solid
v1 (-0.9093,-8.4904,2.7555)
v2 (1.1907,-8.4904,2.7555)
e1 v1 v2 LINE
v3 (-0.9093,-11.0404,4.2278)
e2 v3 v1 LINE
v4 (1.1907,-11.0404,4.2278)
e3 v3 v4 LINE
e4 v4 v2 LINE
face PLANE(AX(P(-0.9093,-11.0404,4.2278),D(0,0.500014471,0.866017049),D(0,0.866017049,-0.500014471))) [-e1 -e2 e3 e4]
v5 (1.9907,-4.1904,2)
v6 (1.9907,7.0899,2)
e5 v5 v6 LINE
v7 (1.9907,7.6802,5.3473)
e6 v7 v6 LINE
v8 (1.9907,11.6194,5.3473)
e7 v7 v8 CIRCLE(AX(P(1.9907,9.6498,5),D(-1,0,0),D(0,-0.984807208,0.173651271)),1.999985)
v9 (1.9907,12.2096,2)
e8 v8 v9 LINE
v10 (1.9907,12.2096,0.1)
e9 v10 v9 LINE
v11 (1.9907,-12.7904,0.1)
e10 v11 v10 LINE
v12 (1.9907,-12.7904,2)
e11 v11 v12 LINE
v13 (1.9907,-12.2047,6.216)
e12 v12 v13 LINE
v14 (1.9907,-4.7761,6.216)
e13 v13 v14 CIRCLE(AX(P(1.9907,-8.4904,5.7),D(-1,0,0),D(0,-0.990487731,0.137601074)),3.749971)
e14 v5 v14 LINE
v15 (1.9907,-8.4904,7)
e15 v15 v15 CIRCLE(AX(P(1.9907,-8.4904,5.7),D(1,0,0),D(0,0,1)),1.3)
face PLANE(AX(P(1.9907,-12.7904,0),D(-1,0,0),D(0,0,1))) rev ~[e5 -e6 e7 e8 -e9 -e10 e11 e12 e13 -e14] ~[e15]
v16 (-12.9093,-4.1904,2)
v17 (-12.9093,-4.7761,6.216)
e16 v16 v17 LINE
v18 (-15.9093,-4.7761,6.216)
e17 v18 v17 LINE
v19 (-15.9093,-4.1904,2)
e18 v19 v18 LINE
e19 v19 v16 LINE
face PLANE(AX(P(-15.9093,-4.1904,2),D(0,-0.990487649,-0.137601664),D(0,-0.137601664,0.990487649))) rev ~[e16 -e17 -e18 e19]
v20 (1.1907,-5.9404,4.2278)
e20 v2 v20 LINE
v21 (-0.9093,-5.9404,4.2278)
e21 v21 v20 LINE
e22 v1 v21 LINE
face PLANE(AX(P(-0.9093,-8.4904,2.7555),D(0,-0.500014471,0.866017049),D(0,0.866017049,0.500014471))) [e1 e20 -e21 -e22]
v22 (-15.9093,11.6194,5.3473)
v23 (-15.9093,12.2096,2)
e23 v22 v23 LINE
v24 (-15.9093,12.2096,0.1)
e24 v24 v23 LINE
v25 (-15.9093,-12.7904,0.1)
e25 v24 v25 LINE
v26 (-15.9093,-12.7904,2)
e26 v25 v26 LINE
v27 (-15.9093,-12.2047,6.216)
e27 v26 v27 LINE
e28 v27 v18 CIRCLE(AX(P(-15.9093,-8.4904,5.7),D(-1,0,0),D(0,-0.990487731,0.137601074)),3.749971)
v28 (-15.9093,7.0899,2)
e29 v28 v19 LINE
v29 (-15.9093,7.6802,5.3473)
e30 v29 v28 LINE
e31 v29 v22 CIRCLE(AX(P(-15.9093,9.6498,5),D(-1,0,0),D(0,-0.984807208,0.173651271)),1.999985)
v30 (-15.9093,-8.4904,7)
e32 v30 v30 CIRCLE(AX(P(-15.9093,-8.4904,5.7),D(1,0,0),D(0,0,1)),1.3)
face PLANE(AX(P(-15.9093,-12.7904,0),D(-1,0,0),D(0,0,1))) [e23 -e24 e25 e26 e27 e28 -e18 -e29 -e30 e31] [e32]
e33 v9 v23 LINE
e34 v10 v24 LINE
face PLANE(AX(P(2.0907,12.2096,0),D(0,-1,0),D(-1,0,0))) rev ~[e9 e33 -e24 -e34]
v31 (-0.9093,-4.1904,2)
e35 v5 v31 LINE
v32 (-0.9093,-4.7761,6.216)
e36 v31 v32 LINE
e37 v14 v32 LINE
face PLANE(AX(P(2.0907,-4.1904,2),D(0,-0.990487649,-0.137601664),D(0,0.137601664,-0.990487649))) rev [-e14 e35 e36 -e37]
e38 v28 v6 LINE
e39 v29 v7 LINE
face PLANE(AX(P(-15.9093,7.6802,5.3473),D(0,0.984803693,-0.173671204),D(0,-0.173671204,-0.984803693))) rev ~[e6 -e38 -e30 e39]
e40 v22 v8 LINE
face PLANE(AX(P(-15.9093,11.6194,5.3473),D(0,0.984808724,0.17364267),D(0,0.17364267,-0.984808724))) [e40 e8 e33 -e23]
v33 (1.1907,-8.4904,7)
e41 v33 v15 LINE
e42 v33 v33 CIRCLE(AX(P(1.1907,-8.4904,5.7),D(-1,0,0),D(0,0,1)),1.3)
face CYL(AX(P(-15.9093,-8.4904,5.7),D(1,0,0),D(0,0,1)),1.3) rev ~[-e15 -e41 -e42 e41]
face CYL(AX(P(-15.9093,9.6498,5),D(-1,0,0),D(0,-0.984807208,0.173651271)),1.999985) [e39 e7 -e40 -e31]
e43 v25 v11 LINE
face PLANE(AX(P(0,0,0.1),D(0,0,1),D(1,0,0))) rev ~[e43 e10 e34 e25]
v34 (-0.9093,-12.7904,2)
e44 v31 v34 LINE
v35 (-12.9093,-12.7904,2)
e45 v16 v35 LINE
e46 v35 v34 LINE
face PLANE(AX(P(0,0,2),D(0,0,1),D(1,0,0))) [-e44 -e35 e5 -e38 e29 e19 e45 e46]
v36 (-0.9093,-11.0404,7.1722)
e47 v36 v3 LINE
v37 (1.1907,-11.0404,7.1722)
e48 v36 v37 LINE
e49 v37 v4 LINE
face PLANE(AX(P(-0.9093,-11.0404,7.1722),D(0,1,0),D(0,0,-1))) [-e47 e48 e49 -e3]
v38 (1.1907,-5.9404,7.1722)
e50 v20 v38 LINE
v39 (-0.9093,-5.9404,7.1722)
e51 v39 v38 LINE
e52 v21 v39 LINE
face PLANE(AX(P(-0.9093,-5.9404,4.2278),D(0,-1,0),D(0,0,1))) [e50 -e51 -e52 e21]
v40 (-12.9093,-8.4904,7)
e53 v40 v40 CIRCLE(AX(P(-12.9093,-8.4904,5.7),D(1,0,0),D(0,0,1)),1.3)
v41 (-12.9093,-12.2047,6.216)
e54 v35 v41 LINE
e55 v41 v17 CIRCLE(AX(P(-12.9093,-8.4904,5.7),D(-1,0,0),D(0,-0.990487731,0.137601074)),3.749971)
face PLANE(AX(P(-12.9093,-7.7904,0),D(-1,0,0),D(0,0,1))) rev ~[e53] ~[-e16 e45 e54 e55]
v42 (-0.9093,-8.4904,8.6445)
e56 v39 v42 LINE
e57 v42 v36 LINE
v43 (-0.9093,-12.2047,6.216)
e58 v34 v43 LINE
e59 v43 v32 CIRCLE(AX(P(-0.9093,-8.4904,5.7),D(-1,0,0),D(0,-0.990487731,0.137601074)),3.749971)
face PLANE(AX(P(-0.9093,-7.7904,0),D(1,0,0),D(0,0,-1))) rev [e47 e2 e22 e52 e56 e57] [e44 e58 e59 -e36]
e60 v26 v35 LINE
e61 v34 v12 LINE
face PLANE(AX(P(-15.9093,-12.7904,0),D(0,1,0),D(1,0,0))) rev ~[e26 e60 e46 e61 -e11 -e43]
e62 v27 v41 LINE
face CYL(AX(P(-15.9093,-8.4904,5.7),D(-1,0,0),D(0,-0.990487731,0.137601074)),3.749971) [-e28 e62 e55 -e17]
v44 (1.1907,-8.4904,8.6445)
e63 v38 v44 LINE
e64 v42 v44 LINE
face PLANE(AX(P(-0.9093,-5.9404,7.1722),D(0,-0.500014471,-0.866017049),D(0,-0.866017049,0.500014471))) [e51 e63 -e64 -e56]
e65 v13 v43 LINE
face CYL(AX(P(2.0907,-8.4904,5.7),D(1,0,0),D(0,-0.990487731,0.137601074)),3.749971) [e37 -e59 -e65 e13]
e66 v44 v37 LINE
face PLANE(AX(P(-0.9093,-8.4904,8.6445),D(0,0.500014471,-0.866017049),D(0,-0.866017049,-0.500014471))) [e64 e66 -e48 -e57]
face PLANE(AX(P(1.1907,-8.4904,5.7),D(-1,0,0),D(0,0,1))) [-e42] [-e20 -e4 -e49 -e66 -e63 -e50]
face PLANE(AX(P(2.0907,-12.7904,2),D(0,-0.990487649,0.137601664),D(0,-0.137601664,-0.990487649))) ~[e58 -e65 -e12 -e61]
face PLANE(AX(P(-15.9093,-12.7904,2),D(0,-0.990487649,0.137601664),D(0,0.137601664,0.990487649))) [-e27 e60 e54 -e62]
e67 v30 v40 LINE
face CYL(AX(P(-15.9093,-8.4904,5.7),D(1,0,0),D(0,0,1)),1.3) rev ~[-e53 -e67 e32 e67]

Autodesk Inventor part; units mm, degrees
ref_plane "YZ Plane" through (0, 0, 0) normal (1, 0, 0) x (0, 1, 0)
ref_plane "XZ Plane" through (0, 0, 0) normal (0, 1, 0) x (-1, 0, 0)
ref_plane "XY Plane" through (0, 0, 0) normal (0, 0, 1) x (1, 0, 0)
sketch "Sketch1" plane through (0, 0, 0) normal (0, 0, 1) x (1, 0, 0)
  line L0 (2.0907, -12.7904) -> (2.0907, 12.2096)
  line L1 (2.0907, 12.2096) -> (-15.9093, 12.2096)
  line L2 (-15.9093, 12.2096) -> (-15.9093, -12.7904)
  line L3 (-15.9093, -12.7904) -> (2.0907, -12.7904) projected
  line L4 (-15.9093, 17.2096) -> (-15.9093, -14.7904) construction
  line L5 (2.0907, -14.7904) -> (2.0907, 17.2096) construction
  dimension "d27" = 25
extrude "Extrusion1" add sketch "Sketch1" along normal blind 2
sketch "Sketch2" plane through (-15.9093, -7.7904, 0) normal (-1, 0, 0) x (0, 0, 1)
  circle A0 centre (5.7, -0.7) radius 1.25 construction
  line L0 (2, -5) -> (6.216, -4.4143)
  arc A1 (6.216, -4.4143) -> (6.216, 3.0143) centre (5.7, -0.7) ccw
  line L1 (5.7, -0.7) -> (2, -0.7) construction
  line L2 (2, 3.6) -> (6.216, 3.0143)
  line L3 (2, 3.6) -> (2, -5)
  line L4 (0, -5) -> (2, -5) construction
  arc A2 (4.4, -0.7) -> (7, -0.7) centre (5.7, -0.7) ccw construction
  dimension "d2" = 2.5
  dimension "d3" = 3.75
extrude "Extrusion2" add sketch "Sketch2" against normal blind 3
ref_plane "Work Plane1" through (-6.9093, -12.7904, 0) normal (-1, 0, 0) x (0, 0, 1)
mirror "Mirror1" about plane through (-6.9093, -12.7904, 0) normal (-1, 0, 0) of "Extrusion2"
hole "Hole1" at (-15.9093, -8.4904, 5.7) direction (1, 0, 0) diameter 2.6 end through all clearance for "Socket Head Cap Screw ISO 4762" size "M2.5" standard "ISO"
sketch "Sketch3" plane through (-0.9093, -8.4904, 5.7) normal (-1, 0, 0) x (0, 0, 1)
  circle A0 centre (0, 0) radius 1.3 projected
  line L0 (-1.4722, -2.55) -> (-2.9445, 0)
  line L1 (-2.9445, 0) -> (-1.4722, 2.55)
  line L2 (-1.4722, 2.55) -> (1.4722, 2.55)
  line L3 (1.4722, 2.55) -> (2.9445, 0)
  line L4 (2.9445, 0) -> (1.4722, -2.55)
  line L5 (1.4722, -2.55) -> (-1.4722, -2.55)
  point P0 (-5.7, 8.4904)
  point P1 (0, 0)
  dimension "d18" = 5.1
extrude "Extrusion3" cut sketch "Sketch3" against normal blind 2.1
sketch "Sketch4" plane through (-15.9093, -12.7904, 0) normal (-1, 0, 0) x (0, 0, 1)
  arc A0 (5.3473, 20.4706) -> (5.3473, 24.4098) centre (5, 22.4402) ccw
  line L0 (5, 22.4402) -> (2, 22.4402) construction
  line L1 (2, 25) -> (2, 8.6) construction
  line L2 (5.3473, 24.4098) -> (2, 25)
  line L3 (5.3473, 20.4706) -> (2, 19.8803)
  line L4 (2, 25) -> (2, 19.8803)
  point P0 (0, 12.7904)
  dimension "d21" = 2
  dimension "d22" = 3
  dimension "d24" = 80
extrude "Extrusion4" add sketch "Sketch4" against normal up to surface (18 mm away)
thicken "Thicken1" operation add thickness 0.1 both sides no extend neighbours yes toward (-1, 0, 0) faces at (2.0907, -1.5904, 0.6667)
thicken "Thicken2" operation add thickness 0.1 both sides no extend neighbours yes toward (0, 0, 1) faces at (-3.976, -4.4571, 0)
properties part number "Encoder_Mount1_Slider"
